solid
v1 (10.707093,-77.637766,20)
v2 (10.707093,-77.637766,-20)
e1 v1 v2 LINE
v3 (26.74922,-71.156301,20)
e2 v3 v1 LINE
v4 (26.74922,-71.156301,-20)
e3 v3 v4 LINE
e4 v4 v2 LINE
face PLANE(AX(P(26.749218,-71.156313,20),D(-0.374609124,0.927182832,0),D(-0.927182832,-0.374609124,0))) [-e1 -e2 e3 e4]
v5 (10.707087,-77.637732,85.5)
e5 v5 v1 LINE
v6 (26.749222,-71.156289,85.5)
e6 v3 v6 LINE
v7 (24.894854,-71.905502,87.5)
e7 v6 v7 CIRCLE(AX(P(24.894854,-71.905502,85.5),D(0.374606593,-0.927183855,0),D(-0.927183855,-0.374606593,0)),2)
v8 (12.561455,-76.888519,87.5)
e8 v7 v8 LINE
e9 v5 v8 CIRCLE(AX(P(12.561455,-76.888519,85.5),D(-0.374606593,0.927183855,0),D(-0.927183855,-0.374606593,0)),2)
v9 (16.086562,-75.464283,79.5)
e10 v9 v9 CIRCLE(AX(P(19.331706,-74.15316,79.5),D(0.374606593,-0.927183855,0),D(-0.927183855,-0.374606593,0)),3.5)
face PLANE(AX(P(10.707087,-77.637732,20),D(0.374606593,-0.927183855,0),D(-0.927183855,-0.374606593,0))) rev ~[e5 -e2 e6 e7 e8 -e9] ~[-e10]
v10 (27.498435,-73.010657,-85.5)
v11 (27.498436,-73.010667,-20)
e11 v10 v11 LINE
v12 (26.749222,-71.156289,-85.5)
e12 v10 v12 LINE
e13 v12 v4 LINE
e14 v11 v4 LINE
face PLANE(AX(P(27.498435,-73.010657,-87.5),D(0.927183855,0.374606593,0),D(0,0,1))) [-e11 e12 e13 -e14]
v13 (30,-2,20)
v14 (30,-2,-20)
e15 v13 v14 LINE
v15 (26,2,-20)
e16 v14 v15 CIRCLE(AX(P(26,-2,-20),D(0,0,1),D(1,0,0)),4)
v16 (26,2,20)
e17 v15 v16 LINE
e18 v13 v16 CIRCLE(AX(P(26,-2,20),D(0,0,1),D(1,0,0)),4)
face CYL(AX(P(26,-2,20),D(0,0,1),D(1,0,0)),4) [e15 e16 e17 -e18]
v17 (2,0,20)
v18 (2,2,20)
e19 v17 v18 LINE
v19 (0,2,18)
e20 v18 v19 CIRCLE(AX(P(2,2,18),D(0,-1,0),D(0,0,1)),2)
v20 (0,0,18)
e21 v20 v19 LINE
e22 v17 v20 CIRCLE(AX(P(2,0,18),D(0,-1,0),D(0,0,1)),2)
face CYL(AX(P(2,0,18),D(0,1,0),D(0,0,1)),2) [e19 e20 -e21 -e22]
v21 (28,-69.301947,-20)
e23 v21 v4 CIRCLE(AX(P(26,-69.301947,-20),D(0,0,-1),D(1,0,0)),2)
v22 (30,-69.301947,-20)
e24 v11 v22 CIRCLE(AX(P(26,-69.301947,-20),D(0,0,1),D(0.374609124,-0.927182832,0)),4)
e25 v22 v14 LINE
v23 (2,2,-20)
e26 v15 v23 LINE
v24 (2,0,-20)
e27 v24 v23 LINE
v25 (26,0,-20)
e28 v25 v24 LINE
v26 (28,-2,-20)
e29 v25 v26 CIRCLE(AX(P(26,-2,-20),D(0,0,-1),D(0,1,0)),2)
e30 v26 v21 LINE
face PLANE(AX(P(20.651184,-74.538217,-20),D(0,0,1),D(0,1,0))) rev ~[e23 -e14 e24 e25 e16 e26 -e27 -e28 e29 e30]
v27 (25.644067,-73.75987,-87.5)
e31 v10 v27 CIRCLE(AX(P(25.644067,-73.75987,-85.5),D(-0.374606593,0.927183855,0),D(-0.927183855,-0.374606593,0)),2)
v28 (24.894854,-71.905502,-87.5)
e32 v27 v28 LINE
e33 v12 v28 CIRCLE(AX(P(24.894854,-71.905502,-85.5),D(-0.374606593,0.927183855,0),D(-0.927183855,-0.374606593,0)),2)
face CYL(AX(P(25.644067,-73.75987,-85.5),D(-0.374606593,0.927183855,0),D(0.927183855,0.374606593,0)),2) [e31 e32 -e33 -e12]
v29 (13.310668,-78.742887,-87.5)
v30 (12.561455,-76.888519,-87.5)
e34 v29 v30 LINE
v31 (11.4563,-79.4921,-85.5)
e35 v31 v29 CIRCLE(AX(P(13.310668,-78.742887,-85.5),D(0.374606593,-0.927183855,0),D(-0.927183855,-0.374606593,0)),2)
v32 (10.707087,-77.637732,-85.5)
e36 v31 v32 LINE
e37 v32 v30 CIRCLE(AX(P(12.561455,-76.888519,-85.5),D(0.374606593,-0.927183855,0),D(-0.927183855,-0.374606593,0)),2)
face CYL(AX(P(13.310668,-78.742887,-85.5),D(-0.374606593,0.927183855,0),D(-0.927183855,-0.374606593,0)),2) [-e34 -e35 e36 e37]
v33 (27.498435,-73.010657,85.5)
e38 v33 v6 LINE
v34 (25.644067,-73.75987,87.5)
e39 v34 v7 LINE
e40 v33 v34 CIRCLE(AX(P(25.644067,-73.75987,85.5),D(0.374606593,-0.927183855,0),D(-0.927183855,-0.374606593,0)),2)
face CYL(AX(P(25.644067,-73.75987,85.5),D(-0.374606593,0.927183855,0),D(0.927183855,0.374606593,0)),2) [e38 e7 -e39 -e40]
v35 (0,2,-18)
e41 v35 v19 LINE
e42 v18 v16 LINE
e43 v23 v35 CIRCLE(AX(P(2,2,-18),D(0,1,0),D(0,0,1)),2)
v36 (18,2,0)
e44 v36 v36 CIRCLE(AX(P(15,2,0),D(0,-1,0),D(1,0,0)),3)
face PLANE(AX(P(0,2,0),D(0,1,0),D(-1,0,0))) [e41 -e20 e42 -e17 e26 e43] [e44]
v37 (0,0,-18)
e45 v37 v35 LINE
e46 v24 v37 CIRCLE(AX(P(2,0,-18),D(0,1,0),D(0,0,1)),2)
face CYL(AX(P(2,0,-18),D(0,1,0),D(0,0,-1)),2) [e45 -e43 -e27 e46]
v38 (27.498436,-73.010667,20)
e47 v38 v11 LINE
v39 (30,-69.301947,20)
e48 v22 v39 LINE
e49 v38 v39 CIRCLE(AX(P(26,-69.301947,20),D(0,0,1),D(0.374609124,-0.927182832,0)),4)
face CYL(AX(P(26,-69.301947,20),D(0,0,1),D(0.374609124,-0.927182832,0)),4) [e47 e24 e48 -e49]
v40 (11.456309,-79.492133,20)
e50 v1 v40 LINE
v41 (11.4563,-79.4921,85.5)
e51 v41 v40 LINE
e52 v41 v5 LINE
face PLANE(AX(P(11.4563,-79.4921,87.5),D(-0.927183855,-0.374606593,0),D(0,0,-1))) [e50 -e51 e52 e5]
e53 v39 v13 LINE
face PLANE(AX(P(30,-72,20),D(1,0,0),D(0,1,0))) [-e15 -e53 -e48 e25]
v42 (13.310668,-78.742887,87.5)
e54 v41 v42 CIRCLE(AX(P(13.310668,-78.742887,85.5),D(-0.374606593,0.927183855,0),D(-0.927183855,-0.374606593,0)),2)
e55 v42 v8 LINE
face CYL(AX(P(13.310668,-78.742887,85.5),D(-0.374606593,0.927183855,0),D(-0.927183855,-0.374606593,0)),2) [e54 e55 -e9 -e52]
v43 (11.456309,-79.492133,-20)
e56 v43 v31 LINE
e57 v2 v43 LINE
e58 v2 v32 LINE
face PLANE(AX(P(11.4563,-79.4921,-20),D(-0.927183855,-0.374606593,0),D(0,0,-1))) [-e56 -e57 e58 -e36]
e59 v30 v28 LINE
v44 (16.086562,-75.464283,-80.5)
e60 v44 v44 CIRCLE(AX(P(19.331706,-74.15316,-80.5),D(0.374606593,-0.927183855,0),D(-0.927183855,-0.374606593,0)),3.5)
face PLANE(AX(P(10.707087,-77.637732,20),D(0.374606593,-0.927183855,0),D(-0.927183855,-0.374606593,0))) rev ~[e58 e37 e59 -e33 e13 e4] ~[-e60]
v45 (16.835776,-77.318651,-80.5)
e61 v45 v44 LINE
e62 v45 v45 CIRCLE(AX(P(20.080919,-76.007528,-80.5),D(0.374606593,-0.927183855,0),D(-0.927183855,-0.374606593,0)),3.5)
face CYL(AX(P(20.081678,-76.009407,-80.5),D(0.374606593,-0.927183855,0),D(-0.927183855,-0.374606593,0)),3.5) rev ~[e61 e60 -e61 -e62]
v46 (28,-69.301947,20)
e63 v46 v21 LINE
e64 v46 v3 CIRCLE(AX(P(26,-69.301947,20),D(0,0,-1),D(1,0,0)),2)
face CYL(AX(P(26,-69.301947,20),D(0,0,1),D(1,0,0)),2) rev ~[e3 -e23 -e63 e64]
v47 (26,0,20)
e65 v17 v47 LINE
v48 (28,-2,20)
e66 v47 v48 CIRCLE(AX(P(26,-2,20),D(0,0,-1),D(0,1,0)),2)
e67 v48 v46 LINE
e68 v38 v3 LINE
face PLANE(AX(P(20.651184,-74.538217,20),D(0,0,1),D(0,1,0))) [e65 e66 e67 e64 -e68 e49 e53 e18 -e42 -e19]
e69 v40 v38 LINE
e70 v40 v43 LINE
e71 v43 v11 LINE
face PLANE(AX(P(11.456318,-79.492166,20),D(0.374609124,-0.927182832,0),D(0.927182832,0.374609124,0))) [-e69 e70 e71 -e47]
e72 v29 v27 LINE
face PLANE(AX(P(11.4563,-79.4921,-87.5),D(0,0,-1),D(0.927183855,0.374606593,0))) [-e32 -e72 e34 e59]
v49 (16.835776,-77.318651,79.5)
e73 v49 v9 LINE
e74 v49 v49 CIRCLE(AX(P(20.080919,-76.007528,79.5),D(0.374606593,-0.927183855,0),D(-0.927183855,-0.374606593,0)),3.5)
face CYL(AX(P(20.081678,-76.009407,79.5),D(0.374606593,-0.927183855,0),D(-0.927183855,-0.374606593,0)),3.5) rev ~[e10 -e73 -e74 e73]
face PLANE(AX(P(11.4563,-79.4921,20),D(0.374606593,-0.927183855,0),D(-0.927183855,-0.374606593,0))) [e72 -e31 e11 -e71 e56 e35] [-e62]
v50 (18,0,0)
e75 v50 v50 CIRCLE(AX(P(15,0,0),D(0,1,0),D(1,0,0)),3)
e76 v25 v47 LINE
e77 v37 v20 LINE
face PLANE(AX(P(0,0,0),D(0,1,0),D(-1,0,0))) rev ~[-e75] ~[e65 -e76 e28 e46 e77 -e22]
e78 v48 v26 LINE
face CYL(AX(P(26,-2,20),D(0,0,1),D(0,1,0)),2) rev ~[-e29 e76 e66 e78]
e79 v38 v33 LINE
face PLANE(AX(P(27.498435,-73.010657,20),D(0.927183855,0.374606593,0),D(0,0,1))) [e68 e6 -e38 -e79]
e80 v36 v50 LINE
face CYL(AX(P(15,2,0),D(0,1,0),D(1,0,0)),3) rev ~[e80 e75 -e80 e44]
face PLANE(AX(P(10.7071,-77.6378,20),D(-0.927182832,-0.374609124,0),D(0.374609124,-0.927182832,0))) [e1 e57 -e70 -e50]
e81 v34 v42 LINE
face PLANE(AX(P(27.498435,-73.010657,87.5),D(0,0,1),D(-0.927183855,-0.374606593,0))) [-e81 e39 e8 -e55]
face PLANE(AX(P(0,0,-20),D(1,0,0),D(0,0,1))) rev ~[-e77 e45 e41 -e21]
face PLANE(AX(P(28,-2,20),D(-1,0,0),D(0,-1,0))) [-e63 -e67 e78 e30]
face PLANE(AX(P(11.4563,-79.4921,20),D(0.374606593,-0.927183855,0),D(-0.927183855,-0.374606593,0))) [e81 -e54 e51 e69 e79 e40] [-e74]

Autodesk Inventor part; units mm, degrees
ref_plane "YZ Plane" through (0, 0, 0) normal (1, 0, 0) x (0, 1, 0)
ref_plane "XZ Plane" through (0, 0, 0) normal (0, 1, 0) x (-1, 0, 0)
ref_plane "XY Plane" through (0, 0, 0) normal (0, 0, 1) x (1, 0, 0)
sketch "Sketch1" plane through (0, 0, 0) normal (0, 1, 0) x (-1, 0, 0)
  line L0 (0, 20) -> (-30, 20)
  line L1 (-30, 20) -> (-30, -20)
  line L2 (-30, -20) -> (0, -20)
  line L3 (0, -20) -> (0, 20)
  point P0 (0, 0)
  dimension "d0" = 20
  dimension "d1" = 20
  dimension "d2" = 0
  dimension "d3" = 30
extrude "Plate1" add sketch "Sketch1" along normal blind 2
sketch "Sketch2" plane through (28, 2, -20) normal (1, 0, 0) x (0, -1, 0)
  line L0 (0, 40) -> (0, 0)
  line L1 (0, 0) -> (74, 0)
  line L2 (74, 0) -> (74, 40)
  line L3 (74, 40) -> (0, 40)
edge flange "Flange1" height 74 angle -90 thickness 2 bend radius 2 thickness toward (1, 0, 0) relief tear relief width 2 relief depth 1 edges at (30, 2, 0) wall of the first edge with corners at (28, 2, 20) (28, 2, -20) (28, -72, -20) (28, -72, 20)
bend "Bend1"
corner "Corner1"
sketch "Sketch3" plane through (29.2508, -70.1456, 20) normal (0.3746066, -0.9271839, 0) x (0.9271839, 0.3746066, 0)
  line L0 (0, -40) -> (0, 0)
  line L1 (0, 0) -> (-20, 0)
  line L2 (-20, 0) -> (-20, -40)
  line L3 (-20, -40) -> (0, -40)
edge flange "Flange2" height 20 angle 68 thickness 2 bend radius 2 thickness toward (0.3746066, -0.9271839, 0) relief tear relief width 2 relief depth 1 edges at (28, -72, 0) wall of the first edge with corners at (29.2508, -70.1456, -20) (29.2508, -70.1456, 20) (10.7071, -77.6378, 20) (10.7071, -77.6378, -20)
bend "Bend2"
corner "Corner2"
sketch "Sketch4" plane through (11.4563, -79.4921, 20) normal (0.3746066, -0.9271839, 0) x (-0.9271839, -0.3746066, 0)
  line L0 (-17.302, 40) -> (-17.302, 0) projected
  line L1 (0, 0) -> (-17.302, 0) projected
  line L2 (0, 40) -> (0, 0) projected
  line L3 (-17.302, 40) -> (0, 40) projected
  line L4 (-17.302, -67.5) -> (0, -67.5)
  line L5 (0, -67.5) -> (0, 107.5)
  line L6 (0, 107.5) -> (-17.302, 107.5)
  line L7 (-17.302, 107.5) -> (-17.302, -67.5)
  point P0 (-19.1562, 20)
  dimension "d26" = 87.5
  dimension "d27" = 87.5
  dimension "d28" = 0
  dimension "d30" = 0
extrude "Extrusion1" add sketch "Sketch4" against normal blind 2 contours L7 L6 L5 L3 | L1 L5 L4 L7
sketch "Sketch5" plane through (0, 2, 0) normal (0, 1, 0) x (1, 0, 0)
  circle A0 centre (15, 0) radius 3
  line L0 (36, 0) -> (-6, 0) projected
  point P0 (0, 0)
  dimension "d51" = 6
  dimension "d52" = 0
  dimension "d53" = 15
extrude "Extrusion2" cut sketch "Sketch5" against normal blind 2
sketch "Sketch6" plane through (27.4984, -73.0107, 87.5) normal (0.3746066, -0.9271839, 0) x (-0.9271839, -0.3746066, 0)
  circle A0 centre (8, 8) radius 3.5
  line L0 (0, 107.5) -> (0, 67.5) projected
  line L1 (0, 67.5) -> (0, 0) projected
  line L2 (0, 0) -> (17.302, 0) projected
  line L3 (17.302, 0) -> (17.302, 175) projected
  line L4 (17.302, 175) -> (0, 175) projected
  line L5 (0, 175) -> (0, 107.5) projected
  circle A1 centre (8, 168) radius 3.5
  point P0 (-1.8542, 87.5)
  dimension "d38" = 7
  dimension "d39" = 8
  dimension "d40" = 8
  dimension "d43" = 160
extrude "Extrusion3" cut sketch "Sketch6" against normal blind 2 contours A0 | A1
fillet "Fillet1" radius 2 6 edges at (0, 1, 20) (0, 1, -20) (11.0817, -78.5649, 87.5) (27.1238, -72.0835, 87.5) (11.0817, -78.5649, -87.5) (27.1238, -72.0835, -87.5)
equation "\"d4\" = Thickness"
equation "\"d5\" = BendReliefWidth"
equation "\"d6\" = BendReliefDepth"
equation "\"d7\" = MinimumRemnant"
equation "\"d8\" = TransitionRadius"
equation "\"d11\" = BendRadius"
equation "\"d12\" = CornerReliefSize"
equation "\"d13\" = GapSize"
equation "\"d14\" = JacobiRadiusSize"
equation "\"d15\" = BendReliefWidth"
equation "\"d16\" = BendReliefDepth"
equation "\"d17\" = MinimumRemnant"
equation "\"d18\" = TransitionRadius"
equation "\"d21\" = BendRadius"
equation "\"d22\" = CornerReliefSize"
equation "\"d23\" = GapSize"
equation "\"d24\" = JacobiRadiusSize"
equation "\"d27\" = d26"
equation "\"d1\" = d0"
equation "\"BendRadius\" = Thickness"
equation "\"BendReliefWidth\" = Thickness"
equation "\"BendReliefDepth\" = 0.5 * Thickness"
equation "\"CornerReliefSize\" = 4 * Thickness"
equation "\"MinimumRemnant\" = 2 * Thickness"
equation "\"TransitionRadius\" = BendRadius"
equation "\"JacobiRadiusSize\" = BendRadius"
equation "\"GapSize\" = Thickness"
equation "\"Thickness\" = 2"
properties part number "Bottom Mount" material "Stainless Steel"
